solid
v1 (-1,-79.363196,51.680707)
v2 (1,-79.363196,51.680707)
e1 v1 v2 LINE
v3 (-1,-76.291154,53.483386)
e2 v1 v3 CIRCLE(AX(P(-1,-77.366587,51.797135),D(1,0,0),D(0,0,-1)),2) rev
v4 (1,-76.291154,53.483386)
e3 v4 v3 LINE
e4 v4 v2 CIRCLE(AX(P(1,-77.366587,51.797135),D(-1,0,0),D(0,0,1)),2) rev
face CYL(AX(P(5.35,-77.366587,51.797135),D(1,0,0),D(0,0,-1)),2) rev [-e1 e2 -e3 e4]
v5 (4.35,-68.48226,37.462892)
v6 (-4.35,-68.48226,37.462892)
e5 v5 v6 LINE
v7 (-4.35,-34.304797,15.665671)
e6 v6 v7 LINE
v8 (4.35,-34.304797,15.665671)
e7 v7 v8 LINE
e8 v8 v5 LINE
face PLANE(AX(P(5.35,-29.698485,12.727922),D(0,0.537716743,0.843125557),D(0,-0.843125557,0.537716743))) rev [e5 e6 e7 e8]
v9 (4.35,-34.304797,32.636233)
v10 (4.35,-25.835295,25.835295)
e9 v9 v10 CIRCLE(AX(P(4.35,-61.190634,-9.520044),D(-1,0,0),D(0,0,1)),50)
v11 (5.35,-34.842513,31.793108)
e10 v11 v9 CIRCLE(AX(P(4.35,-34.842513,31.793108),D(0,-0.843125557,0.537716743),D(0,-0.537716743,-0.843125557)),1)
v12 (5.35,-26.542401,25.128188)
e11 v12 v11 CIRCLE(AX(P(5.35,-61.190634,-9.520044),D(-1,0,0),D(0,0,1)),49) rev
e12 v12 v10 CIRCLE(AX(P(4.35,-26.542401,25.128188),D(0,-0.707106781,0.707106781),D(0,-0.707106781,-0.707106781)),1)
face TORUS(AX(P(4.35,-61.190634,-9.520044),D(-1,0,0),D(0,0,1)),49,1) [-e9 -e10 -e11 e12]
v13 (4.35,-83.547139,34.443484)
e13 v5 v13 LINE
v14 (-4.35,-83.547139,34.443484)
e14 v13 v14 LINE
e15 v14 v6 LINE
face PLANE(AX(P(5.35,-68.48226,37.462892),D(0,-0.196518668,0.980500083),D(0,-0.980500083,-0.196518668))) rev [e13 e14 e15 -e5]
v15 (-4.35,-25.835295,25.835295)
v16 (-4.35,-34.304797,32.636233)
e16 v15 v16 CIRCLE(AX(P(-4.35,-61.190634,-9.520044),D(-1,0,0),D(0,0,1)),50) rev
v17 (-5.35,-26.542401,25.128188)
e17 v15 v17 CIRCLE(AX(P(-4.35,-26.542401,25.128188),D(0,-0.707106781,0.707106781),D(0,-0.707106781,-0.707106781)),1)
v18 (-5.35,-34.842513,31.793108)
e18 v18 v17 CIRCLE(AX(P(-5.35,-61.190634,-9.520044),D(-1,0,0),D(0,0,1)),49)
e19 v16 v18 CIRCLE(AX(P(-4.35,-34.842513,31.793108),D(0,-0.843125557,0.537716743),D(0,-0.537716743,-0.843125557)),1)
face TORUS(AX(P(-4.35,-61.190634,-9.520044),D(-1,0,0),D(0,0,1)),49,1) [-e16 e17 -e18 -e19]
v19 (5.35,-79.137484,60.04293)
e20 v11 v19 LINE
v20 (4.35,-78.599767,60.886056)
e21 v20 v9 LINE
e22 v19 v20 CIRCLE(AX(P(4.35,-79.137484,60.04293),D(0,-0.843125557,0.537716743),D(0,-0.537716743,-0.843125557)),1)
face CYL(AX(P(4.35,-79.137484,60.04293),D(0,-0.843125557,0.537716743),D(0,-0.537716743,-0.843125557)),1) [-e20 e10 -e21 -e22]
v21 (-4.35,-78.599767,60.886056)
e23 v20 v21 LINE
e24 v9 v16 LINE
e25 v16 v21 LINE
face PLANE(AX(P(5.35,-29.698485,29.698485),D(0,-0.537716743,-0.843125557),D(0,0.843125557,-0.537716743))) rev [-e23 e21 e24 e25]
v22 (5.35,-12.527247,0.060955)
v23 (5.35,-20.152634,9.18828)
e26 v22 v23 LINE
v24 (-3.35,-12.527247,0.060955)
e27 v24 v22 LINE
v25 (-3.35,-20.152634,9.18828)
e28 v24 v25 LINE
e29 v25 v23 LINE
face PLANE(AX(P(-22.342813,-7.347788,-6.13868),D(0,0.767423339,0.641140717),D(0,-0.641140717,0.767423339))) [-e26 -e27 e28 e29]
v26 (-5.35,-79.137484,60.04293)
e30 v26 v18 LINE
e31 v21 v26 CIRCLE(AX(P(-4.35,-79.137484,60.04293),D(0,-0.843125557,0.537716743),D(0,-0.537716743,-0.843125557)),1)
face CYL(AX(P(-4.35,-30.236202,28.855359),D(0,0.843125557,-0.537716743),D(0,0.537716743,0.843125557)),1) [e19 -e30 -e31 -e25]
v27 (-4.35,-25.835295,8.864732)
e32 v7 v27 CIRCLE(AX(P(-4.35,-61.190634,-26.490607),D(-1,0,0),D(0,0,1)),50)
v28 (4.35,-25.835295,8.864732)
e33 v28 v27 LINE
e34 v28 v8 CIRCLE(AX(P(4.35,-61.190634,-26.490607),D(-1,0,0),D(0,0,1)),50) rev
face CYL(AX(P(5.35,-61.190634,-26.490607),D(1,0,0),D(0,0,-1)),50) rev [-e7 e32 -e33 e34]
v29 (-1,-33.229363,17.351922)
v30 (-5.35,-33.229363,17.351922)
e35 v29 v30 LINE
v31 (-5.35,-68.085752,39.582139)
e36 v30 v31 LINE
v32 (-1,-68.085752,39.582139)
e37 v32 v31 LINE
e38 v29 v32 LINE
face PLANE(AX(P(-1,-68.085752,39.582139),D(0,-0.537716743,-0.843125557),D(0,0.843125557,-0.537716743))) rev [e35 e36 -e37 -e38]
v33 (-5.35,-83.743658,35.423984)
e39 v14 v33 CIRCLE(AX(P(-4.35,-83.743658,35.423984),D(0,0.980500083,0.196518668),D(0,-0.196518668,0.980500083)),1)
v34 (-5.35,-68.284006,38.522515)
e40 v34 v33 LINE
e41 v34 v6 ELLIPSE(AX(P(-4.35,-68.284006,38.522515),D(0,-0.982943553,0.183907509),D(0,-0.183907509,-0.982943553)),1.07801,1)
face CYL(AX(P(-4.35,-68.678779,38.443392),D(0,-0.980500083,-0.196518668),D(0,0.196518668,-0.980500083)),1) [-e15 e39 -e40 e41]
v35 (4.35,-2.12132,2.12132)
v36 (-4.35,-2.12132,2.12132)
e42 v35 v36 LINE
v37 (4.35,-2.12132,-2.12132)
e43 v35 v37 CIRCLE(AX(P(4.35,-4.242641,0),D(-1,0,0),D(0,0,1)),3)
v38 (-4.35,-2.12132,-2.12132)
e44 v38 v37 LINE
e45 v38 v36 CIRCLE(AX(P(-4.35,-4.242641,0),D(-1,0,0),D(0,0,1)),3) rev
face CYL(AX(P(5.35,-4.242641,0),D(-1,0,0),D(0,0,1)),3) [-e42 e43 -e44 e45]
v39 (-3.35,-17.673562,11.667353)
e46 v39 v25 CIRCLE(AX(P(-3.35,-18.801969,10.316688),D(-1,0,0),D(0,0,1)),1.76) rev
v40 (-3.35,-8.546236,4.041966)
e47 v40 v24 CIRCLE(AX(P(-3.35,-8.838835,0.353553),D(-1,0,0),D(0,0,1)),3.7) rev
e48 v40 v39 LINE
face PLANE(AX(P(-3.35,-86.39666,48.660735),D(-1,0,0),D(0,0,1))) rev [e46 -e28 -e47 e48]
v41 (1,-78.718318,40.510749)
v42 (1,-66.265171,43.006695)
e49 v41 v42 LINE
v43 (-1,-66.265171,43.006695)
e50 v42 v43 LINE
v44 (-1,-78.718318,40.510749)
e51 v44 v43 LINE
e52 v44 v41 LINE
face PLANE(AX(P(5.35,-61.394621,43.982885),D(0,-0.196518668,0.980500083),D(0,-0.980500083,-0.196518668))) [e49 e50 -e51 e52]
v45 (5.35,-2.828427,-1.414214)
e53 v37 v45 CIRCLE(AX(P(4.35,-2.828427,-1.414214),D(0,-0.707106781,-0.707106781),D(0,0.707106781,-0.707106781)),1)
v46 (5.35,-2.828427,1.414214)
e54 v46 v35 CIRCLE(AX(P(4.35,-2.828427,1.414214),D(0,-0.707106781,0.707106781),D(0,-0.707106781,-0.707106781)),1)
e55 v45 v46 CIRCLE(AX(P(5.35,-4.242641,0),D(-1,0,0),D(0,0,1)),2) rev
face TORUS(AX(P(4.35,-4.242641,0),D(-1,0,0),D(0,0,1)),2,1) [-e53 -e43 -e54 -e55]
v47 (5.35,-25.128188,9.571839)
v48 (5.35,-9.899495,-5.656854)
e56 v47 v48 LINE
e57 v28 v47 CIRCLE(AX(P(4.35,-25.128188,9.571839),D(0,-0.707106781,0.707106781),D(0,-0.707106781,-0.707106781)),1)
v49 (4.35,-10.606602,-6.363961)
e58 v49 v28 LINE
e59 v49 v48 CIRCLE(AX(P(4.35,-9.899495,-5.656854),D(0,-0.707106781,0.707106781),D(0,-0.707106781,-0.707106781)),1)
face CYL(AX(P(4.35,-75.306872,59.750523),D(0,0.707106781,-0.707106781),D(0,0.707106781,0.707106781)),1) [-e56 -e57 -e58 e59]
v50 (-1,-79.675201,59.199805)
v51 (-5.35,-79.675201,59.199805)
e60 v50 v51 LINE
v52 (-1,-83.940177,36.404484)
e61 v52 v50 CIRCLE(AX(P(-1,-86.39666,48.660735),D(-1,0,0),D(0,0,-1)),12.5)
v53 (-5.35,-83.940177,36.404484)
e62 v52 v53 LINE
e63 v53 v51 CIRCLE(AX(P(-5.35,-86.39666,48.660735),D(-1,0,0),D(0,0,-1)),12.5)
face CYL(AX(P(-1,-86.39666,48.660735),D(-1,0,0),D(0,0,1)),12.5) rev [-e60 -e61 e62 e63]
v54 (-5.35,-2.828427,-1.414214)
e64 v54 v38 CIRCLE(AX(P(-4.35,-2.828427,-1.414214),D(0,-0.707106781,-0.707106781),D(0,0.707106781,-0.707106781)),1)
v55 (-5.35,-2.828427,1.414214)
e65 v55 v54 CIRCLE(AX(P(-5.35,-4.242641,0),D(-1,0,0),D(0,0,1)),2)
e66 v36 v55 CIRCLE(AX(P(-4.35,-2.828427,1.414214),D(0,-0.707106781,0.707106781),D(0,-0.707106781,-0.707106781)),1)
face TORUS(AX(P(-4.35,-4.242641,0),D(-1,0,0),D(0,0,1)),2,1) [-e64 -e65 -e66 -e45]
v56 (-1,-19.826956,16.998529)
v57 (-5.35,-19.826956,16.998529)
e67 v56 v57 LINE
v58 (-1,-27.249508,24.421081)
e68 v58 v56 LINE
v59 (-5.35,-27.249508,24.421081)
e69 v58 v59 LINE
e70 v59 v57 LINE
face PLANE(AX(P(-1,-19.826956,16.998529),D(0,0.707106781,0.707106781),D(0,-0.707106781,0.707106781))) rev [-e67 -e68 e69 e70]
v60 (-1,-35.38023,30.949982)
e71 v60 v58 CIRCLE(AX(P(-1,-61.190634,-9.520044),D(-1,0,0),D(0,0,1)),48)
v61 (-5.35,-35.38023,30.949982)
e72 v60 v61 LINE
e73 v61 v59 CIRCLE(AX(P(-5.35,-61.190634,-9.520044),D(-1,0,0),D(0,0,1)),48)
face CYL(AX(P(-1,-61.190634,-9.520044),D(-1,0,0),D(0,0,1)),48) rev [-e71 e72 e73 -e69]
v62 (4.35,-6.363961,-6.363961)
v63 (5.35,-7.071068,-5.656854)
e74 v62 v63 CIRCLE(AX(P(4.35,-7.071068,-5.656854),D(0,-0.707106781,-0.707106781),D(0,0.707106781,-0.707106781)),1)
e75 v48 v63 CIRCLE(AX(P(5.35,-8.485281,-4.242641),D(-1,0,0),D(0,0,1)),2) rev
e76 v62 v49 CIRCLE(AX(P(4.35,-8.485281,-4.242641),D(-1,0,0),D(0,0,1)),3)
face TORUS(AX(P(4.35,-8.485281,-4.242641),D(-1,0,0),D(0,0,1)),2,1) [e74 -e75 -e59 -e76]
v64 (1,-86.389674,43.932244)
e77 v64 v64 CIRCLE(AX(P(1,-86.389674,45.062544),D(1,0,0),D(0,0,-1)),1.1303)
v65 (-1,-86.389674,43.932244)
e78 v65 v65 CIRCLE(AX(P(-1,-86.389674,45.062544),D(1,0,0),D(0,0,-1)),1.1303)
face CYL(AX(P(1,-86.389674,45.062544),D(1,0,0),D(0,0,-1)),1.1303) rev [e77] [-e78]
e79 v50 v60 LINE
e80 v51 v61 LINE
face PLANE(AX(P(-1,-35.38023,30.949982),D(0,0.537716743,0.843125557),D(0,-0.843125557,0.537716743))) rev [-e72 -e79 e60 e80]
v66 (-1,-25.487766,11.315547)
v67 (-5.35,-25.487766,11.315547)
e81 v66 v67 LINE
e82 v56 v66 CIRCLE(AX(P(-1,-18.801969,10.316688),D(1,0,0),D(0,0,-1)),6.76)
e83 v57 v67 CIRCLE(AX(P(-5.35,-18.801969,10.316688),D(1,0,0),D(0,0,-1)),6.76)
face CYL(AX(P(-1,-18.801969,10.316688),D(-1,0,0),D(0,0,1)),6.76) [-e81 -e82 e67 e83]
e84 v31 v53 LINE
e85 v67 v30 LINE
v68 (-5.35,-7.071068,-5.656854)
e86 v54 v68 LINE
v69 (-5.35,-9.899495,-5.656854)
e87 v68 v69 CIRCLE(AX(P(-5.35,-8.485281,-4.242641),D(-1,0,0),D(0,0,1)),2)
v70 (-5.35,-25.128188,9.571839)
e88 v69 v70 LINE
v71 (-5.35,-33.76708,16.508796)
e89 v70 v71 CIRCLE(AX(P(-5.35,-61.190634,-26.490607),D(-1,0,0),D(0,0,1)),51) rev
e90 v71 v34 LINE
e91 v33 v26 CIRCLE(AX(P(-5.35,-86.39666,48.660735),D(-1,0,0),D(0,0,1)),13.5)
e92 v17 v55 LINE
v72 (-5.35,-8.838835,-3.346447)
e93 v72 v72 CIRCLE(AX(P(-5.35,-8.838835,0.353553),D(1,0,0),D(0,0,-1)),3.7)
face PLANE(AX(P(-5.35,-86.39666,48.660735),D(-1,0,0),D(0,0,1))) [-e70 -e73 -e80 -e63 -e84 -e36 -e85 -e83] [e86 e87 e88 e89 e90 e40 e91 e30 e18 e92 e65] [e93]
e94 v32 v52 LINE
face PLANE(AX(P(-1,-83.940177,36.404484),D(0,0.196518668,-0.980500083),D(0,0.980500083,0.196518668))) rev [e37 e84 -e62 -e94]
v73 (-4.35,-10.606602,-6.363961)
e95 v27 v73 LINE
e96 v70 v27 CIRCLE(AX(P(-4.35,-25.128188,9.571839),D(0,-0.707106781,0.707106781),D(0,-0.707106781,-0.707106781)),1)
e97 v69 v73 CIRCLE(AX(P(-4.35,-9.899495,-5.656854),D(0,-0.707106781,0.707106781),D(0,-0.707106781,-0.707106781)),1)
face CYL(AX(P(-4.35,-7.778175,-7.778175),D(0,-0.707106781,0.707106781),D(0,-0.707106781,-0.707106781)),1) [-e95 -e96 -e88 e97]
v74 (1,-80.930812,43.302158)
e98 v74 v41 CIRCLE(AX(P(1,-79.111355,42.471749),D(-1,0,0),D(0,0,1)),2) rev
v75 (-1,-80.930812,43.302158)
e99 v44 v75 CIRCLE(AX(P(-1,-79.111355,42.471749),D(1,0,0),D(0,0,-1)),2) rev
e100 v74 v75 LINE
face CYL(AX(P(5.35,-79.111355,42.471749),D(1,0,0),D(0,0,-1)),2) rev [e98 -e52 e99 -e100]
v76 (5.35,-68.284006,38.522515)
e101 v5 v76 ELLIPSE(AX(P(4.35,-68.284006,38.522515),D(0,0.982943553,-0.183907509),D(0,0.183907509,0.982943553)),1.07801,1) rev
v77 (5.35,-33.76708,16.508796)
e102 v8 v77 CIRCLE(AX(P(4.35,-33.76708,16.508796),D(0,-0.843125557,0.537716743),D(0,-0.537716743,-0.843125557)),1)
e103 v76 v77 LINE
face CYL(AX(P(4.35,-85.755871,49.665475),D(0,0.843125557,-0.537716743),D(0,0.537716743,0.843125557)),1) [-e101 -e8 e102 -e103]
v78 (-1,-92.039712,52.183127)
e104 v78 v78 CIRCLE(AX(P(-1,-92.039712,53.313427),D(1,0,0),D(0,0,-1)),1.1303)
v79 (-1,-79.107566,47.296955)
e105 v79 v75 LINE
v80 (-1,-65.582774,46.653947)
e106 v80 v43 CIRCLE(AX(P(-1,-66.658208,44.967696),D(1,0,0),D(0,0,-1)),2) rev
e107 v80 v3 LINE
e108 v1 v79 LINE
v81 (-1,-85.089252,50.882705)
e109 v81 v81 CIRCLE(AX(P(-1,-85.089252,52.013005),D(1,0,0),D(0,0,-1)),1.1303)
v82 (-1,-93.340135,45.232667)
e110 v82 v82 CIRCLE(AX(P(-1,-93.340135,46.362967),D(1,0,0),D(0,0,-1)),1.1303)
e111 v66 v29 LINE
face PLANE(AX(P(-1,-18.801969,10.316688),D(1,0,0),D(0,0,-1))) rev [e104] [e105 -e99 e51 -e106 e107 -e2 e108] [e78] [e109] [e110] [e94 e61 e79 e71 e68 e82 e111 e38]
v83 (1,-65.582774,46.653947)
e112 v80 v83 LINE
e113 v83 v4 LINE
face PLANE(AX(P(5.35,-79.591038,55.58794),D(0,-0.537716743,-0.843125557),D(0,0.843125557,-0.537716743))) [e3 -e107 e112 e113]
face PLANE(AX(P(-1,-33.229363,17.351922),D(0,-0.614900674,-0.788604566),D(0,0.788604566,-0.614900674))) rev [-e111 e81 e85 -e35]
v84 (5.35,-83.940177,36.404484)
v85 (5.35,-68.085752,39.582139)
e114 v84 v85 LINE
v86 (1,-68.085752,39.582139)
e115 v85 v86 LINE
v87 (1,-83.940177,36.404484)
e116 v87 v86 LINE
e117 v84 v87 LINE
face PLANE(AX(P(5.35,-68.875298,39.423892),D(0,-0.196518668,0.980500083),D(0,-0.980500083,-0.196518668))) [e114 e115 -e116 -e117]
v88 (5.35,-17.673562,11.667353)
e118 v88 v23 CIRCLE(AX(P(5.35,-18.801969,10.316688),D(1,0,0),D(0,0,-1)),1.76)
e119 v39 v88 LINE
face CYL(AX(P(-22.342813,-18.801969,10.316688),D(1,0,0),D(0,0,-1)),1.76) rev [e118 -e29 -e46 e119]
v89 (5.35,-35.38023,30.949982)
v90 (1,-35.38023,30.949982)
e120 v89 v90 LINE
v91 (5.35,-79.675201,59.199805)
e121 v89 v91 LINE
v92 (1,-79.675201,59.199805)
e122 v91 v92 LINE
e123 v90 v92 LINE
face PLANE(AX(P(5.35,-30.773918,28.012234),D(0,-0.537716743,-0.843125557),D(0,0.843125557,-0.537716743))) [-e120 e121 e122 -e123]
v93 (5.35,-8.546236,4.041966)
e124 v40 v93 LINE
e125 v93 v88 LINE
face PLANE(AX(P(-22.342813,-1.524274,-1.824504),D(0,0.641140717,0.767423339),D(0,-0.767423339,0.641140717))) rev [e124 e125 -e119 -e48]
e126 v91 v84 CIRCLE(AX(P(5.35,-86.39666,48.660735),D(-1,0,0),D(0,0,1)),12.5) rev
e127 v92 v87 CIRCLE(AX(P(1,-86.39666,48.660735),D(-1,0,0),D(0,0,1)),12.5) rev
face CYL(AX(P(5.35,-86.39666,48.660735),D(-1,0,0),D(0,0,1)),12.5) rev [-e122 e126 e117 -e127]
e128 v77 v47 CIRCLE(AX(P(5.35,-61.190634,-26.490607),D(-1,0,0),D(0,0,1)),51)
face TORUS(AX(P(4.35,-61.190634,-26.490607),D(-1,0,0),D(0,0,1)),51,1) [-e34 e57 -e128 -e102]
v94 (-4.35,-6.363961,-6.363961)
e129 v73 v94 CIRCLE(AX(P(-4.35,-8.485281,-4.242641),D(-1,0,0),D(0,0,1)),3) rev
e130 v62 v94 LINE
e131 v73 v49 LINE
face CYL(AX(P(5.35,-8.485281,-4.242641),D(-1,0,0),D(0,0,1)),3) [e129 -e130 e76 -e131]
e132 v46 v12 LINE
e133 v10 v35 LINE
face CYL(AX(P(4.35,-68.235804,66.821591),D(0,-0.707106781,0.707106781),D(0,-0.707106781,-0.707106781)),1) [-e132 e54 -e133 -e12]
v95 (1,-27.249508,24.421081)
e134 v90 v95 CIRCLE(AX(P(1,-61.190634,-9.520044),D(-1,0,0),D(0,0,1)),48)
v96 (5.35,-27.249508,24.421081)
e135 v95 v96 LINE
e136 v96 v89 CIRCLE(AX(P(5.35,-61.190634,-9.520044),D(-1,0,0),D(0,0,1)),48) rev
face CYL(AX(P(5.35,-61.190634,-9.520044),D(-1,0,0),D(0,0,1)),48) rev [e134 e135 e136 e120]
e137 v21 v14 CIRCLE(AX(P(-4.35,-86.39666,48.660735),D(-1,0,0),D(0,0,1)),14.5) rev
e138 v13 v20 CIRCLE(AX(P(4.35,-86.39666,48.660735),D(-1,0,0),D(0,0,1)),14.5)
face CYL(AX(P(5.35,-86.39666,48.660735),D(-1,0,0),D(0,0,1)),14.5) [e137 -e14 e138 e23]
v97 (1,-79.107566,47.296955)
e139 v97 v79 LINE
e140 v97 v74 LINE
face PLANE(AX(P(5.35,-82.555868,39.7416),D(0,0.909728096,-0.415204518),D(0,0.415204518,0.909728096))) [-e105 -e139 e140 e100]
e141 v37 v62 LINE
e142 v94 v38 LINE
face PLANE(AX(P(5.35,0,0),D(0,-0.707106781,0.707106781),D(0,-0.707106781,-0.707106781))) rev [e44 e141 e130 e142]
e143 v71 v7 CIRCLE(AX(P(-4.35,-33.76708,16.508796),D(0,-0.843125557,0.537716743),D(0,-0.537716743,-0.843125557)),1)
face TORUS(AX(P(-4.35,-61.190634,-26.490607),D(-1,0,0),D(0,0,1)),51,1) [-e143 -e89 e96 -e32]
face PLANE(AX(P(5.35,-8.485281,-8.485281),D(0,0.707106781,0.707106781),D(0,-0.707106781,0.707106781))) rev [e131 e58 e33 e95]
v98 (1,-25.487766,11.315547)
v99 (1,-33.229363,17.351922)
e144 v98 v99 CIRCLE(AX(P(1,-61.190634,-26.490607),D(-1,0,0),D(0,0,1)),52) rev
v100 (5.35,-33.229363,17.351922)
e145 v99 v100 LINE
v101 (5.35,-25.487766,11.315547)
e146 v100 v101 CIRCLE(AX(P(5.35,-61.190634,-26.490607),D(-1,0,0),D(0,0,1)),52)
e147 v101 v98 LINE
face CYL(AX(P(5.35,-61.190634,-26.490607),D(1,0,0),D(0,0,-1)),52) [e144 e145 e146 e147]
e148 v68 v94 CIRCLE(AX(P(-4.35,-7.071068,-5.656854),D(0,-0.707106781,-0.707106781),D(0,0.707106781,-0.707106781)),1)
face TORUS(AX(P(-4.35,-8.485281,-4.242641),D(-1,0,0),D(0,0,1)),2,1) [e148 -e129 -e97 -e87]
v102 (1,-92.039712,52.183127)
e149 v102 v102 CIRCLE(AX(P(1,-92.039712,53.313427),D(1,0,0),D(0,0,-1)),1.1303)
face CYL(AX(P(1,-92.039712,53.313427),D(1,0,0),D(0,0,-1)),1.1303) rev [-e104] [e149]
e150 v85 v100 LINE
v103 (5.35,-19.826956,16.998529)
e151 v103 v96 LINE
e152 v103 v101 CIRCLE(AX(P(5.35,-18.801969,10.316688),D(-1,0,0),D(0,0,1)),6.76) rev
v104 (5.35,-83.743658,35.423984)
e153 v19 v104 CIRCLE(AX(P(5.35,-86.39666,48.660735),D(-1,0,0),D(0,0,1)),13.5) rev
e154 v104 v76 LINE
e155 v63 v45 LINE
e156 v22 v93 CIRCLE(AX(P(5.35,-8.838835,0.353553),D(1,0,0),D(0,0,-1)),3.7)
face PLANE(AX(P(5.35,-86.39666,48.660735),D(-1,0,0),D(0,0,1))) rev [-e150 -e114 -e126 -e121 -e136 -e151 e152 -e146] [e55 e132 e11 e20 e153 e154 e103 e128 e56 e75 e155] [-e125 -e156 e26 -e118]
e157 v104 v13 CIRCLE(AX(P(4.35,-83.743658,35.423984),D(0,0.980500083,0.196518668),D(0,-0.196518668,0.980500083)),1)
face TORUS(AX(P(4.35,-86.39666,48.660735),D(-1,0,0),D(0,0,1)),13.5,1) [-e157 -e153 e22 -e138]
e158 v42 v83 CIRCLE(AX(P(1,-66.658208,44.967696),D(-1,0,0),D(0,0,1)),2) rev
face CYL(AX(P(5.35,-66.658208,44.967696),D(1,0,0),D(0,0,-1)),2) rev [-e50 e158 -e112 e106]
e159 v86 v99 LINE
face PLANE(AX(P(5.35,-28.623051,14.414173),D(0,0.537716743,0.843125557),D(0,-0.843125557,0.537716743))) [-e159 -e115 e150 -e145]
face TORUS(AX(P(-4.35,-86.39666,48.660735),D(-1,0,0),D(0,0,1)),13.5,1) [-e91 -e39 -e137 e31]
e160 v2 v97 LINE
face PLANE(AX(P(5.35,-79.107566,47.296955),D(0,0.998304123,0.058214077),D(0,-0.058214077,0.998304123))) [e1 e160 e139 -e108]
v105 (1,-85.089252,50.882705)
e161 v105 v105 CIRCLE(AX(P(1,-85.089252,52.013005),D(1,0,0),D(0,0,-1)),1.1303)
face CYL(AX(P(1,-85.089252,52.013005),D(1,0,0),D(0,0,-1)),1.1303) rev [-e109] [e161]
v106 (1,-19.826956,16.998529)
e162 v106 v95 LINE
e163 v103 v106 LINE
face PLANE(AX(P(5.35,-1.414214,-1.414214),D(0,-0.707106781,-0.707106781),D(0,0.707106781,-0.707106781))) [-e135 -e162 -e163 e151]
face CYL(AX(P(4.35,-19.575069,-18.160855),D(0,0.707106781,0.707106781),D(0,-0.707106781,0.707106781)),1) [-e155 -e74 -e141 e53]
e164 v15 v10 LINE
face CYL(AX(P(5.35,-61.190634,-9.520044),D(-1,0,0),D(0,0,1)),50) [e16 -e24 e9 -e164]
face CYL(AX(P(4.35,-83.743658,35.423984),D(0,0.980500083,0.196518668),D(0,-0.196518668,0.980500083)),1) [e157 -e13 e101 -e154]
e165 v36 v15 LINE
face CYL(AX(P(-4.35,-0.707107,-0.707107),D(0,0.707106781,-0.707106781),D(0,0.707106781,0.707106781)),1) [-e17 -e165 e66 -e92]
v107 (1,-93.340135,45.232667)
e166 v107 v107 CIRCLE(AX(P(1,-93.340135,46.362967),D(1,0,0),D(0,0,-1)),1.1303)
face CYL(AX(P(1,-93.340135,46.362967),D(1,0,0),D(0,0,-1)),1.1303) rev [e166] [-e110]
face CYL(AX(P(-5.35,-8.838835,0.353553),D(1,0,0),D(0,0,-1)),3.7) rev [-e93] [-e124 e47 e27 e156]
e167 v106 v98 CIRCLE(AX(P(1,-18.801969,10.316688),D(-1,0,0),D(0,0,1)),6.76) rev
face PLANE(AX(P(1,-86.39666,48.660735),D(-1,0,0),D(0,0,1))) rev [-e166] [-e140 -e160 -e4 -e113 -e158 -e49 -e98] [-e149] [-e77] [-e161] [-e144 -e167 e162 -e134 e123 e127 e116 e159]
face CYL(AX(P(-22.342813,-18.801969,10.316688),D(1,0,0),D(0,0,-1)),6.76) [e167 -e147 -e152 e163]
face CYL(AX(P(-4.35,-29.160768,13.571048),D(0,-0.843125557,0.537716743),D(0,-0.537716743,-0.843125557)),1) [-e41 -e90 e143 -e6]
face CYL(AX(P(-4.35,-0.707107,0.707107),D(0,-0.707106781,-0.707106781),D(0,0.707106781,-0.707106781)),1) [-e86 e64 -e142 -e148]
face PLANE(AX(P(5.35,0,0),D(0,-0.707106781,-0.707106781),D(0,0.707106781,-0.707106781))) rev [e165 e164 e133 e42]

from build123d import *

# Parameters (mm, degrees)
BOSS_EXTRUDE1_DEPTH   = 5.35
FILLET1_R             = 2
FILLET2_R             = 50
FILLET3_R             = 3
CUT_EXTRUDE1_DEPTH    = 120.515289654
CUT_EXTRUDE2_DEPTH    = 8.7
SHELL3_START          = 1
SHELL3_DEPTH          = 4.35
CUT_EXTRUDE3_DEPTH    = 4.35
FILLET6_R             = 1
F_2_CLEARANCE_HOLE1_D = 2.2606


# Read off the part's stored shape, not the designer's step: Shell3
with BuildPart() as part:
    # Sketch1 → Boss-Extrude1 (new, symmetric)
    with BuildSketch(Plane(origin=(0, 0, 0), x_dir=(0, 0, -1), z_dir=(1, 0, 0))):
        with BuildLine():
            Line((0, 0), (8.485281374, -8.485281374))
            Line((8.485281374, -8.485281374), (-12.727922061, -29.69848481))
            Line((-12.727922061, -29.69848481), (-37.462892244, -68.482260413))
            Line((-37.462892244, -68.482260413), (-34.443484132, -83.547139186))
            ThreePointArc((-34.443484132, -83.547139186), (-51.327394218, -100.649341384), (-60.88605591, -78.599767092))
            Line((-60.88605591, -78.599767092), (-29.69848481, -29.69848481))
            Line((-29.69848481, -29.69848481), (0, 0))
        make_face()
        Polygon((-55.587939854, -79.591037977), (-43.982885085, -61.39462065), (-39.741600188, -82.555868301), (-47.296955003, -79.107566033), align=None, mode=Mode.SUBTRACT)
    extrude(amount=BOSS_EXTRUDE1_DEPTH, both=True)

    # Fillet1
    fillet1_edges = [part.edges().sort_by_distance(p)[0] for p in [
        (0, -82.555868301, 39.741600188),
        (0, -61.39462065, 43.982885085),
        (0, -79.591037977, 55.587939854),
    ]]
    fillet(fillet1_edges, radius=FILLET1_R)

    # Fillet2
    fillet2_edges = [part.edges().sort_by_distance(p)[0] for p in [
        (0, -29.69848481, 12.727922061),
        (0, -29.69848481, 29.69848481),
    ]]
    fillet(fillet2_edges, radius=FILLET2_R)

    # Fillet3
    fillet3_edges = [part.edges().sort_by_distance(p)[0] for p in [
        (0, 0, 0),
        (0, -8.485281374, -8.485281374),
    ]]
    fillet(fillet3_edges, radius=FILLET3_R)

    # Sketch2 → Cut-Extrude1 (cut, through all)
    with BuildSketch(Plane(origin=(5.35, 0, 0), x_dir=(0, 0, -1), z_dir=(1, 0, 0))):
        with BuildLine():
            ThreePointArc((3.346446609, -8.838834765), (-0.207139317, -5.141732803), (-4.041965779, -8.546235975))
            ThreePointArc((-4.041965779, -8.546235975), (-2.969848481, -11.455129855), (-0.060954601, -12.527247153))
            ThreePointArc((-0.060954601, -12.527247153), (2.364222862, -11.349550248), (3.346446609, -8.838834765))
        make_face()
    extrude(amount=-CUT_EXTRUDE1_DEPTH, mode=Mode.SUBTRACT)

    # Sketch2<3> → Cut-Extrude2 (cut)
    with BuildSketch(Plane(origin=(5.35, 0, 0), x_dir=(0, 0, -1), z_dir=(1, 0, 0))):
        with BuildLine():
            ThreePointArc((-0.060954601, -12.527247153), (-2.969848481, -11.455129855), (-4.041965779, -8.546235975))
            Line((-4.041965779, -8.546235975), (-11.667353013, -17.673561649))
            ThreePointArc((-11.667353013, -17.673561649), (-11.561195872, -20.046477247), (-9.188280275, -20.152634388))
            Line((-9.188280275, -20.152634388), (-0.060954601, -12.527247153))
        make_face()
    extrude(amount=-CUT_EXTRUDE2_DEPTH, mode=Mode.SUBTRACT)

    # Shell3 outline → Shell3 (cut)
    with BuildSketch(Plane.YZ.offset(SHELL3_START)):
        with BuildLine():
            ThreePointArc((-25.487766305, 11.315546566), (-23.591345049, 15.08737762), (-19.826956258, 16.998529133))
            Line((-19.826956258, 16.998529133), (-27.249508266, 24.421081141))
            ThreePointArc((-27.249508266, 24.421081141), (-31.137049165, 27.906978673), (-35.380230094, 30.949982361))
            Line((-35.380230094, 30.949982361), (-79.675200579, 59.199804797))
            ThreePointArc((-79.675200579, 59.199804797), (-98.683454279, 50.9595792), (-83.940176521, 36.404484299))
            Line((-83.940176521, 36.404484299), (-68.085752059, 39.582138666))
            Line((-68.085752059, 39.582138666), (-33.229363122, 17.351921839))
            ThreePointArc((-33.229363122, 17.351921839), (-29.215798711, 14.516830312), (-25.487766305, 11.315546566))
        make_face()
        with BuildLine():
            ThreePointArc((-78.71831814, 40.510748766), (-80.678728763, 41.229436179), (-80.930811667, 43.302157969))
            Line((-80.930811667, 43.302157969), (-79.107566033, 47.296955003))
            Line((-79.107566033, 47.296955003), (-79.363195628, 51.680706992))
            ThreePointArc((-79.363195628, 51.680706992), (-78.378789867, 53.5220833), (-76.291153896, 53.48338626))
            Line((-76.291153896, 53.48338626), (-65.582774367, 46.653946778))
            ThreePointArc((-65.582774367, 46.653946778), (-64.692320748, 44.599880647), (-66.265170518, 43.006695498))
            Line((-66.265170518, 43.006695498), (-78.71831814, 40.510748766))
        make_face(mode=Mode.SUBTRACT)
    extrude(amount=SHELL3_DEPTH, mode=Mode.SUBTRACT)

    # Sketch3 → Cut-Extrude3 (cut)
    with BuildSketch(Plane.ZY.offset(5.35)):
        with BuildLine():
            Line((16.998529133, -19.826956258), (24.421081141, -27.249508266))
            ThreePointArc((24.421081141, -27.249508266), (27.906978673, -31.137049165), (30.949982361, -35.380230094))
            Line((30.949982361, -35.380230094), (59.199804797, -79.675200579))
            ThreePointArc((59.199804797, -79.675200579), (50.9595792, -98.683454279), (36.404484299, -83.940176521))
            Line((36.404484299, -83.940176521), (39.582138666, -68.085752059))
            Line((39.582138666, -68.085752059), (17.351921839, -33.229363122))
            Line((17.351921839, -33.229363122), (11.315546566, -25.487766305))
            ThreePointArc((11.315546566, -25.487766305), (15.08737762, -23.591345049), (16.998529133, -19.826956258))
        make_face()
    extrude(amount=-CUT_EXTRUDE3_DEPTH, mode=Mode.SUBTRACT)

    # Fillet6
    fillet6_edges = [part.edges().sort_by_distance(p)[0] for p in [
        (5.35, -100.649341384, 51.327394218),
        (5.35, -76.0146998, 35.953188188),
        (5.35, -51.393528511, 26.564281485),
        (-5.35, -18.220948211, 1.250385462),
        (5.35, -18.220948211, 1.250385462),
        (-5.35, -56.45228185, 46.761144692),
        (5.35, -56.45228185, 46.761144692),
        (-5.35, -29.884816473, 29.466437966),
        (5.35, -29.884816473, 29.466437966),
        (-5.35, -29.884816473, 12.495875217),
        (5.35, -29.884816473, 12.495875217),
        (-5.35, -4.242640687, -4.242640687),
        (5.35, -4.242640687, -4.242640687),
        (-5.35, -13.978307524, 13.978307524),
        (-5.35, -1.242640687, 0),
        (-5.35, -8.485281374, -7.242640687),
        (5.35, -13.978307524, 13.978307524),
        (5.35, -1.242640687, 0),
        (5.35, -8.485281374, -7.242640687),
        (-5.35, -51.393528511, 26.564281485),
        (-5.35, -76.0146998, 35.953188188),
        (-5.35, -100.649341384, 51.327394218),
    ]]
    fillet(fillet6_edges, radius=FILLET6_R)

    # #2 Clearance Hole1 (through all)
    with Locations(Plane(origin=(1, -85.089251529, 52.013004842), x_dir=(0, 0, 1), z_dir=(1, 0, 0))):
        with Locations((0, 0), (-6.950460518, 1.300422466), (1.300422466, 6.950460517), (-5.650038052, 8.250882984)):
            Hole(F_2_CLEARANCE_HOLE1_D / 2)


solid = part.part
